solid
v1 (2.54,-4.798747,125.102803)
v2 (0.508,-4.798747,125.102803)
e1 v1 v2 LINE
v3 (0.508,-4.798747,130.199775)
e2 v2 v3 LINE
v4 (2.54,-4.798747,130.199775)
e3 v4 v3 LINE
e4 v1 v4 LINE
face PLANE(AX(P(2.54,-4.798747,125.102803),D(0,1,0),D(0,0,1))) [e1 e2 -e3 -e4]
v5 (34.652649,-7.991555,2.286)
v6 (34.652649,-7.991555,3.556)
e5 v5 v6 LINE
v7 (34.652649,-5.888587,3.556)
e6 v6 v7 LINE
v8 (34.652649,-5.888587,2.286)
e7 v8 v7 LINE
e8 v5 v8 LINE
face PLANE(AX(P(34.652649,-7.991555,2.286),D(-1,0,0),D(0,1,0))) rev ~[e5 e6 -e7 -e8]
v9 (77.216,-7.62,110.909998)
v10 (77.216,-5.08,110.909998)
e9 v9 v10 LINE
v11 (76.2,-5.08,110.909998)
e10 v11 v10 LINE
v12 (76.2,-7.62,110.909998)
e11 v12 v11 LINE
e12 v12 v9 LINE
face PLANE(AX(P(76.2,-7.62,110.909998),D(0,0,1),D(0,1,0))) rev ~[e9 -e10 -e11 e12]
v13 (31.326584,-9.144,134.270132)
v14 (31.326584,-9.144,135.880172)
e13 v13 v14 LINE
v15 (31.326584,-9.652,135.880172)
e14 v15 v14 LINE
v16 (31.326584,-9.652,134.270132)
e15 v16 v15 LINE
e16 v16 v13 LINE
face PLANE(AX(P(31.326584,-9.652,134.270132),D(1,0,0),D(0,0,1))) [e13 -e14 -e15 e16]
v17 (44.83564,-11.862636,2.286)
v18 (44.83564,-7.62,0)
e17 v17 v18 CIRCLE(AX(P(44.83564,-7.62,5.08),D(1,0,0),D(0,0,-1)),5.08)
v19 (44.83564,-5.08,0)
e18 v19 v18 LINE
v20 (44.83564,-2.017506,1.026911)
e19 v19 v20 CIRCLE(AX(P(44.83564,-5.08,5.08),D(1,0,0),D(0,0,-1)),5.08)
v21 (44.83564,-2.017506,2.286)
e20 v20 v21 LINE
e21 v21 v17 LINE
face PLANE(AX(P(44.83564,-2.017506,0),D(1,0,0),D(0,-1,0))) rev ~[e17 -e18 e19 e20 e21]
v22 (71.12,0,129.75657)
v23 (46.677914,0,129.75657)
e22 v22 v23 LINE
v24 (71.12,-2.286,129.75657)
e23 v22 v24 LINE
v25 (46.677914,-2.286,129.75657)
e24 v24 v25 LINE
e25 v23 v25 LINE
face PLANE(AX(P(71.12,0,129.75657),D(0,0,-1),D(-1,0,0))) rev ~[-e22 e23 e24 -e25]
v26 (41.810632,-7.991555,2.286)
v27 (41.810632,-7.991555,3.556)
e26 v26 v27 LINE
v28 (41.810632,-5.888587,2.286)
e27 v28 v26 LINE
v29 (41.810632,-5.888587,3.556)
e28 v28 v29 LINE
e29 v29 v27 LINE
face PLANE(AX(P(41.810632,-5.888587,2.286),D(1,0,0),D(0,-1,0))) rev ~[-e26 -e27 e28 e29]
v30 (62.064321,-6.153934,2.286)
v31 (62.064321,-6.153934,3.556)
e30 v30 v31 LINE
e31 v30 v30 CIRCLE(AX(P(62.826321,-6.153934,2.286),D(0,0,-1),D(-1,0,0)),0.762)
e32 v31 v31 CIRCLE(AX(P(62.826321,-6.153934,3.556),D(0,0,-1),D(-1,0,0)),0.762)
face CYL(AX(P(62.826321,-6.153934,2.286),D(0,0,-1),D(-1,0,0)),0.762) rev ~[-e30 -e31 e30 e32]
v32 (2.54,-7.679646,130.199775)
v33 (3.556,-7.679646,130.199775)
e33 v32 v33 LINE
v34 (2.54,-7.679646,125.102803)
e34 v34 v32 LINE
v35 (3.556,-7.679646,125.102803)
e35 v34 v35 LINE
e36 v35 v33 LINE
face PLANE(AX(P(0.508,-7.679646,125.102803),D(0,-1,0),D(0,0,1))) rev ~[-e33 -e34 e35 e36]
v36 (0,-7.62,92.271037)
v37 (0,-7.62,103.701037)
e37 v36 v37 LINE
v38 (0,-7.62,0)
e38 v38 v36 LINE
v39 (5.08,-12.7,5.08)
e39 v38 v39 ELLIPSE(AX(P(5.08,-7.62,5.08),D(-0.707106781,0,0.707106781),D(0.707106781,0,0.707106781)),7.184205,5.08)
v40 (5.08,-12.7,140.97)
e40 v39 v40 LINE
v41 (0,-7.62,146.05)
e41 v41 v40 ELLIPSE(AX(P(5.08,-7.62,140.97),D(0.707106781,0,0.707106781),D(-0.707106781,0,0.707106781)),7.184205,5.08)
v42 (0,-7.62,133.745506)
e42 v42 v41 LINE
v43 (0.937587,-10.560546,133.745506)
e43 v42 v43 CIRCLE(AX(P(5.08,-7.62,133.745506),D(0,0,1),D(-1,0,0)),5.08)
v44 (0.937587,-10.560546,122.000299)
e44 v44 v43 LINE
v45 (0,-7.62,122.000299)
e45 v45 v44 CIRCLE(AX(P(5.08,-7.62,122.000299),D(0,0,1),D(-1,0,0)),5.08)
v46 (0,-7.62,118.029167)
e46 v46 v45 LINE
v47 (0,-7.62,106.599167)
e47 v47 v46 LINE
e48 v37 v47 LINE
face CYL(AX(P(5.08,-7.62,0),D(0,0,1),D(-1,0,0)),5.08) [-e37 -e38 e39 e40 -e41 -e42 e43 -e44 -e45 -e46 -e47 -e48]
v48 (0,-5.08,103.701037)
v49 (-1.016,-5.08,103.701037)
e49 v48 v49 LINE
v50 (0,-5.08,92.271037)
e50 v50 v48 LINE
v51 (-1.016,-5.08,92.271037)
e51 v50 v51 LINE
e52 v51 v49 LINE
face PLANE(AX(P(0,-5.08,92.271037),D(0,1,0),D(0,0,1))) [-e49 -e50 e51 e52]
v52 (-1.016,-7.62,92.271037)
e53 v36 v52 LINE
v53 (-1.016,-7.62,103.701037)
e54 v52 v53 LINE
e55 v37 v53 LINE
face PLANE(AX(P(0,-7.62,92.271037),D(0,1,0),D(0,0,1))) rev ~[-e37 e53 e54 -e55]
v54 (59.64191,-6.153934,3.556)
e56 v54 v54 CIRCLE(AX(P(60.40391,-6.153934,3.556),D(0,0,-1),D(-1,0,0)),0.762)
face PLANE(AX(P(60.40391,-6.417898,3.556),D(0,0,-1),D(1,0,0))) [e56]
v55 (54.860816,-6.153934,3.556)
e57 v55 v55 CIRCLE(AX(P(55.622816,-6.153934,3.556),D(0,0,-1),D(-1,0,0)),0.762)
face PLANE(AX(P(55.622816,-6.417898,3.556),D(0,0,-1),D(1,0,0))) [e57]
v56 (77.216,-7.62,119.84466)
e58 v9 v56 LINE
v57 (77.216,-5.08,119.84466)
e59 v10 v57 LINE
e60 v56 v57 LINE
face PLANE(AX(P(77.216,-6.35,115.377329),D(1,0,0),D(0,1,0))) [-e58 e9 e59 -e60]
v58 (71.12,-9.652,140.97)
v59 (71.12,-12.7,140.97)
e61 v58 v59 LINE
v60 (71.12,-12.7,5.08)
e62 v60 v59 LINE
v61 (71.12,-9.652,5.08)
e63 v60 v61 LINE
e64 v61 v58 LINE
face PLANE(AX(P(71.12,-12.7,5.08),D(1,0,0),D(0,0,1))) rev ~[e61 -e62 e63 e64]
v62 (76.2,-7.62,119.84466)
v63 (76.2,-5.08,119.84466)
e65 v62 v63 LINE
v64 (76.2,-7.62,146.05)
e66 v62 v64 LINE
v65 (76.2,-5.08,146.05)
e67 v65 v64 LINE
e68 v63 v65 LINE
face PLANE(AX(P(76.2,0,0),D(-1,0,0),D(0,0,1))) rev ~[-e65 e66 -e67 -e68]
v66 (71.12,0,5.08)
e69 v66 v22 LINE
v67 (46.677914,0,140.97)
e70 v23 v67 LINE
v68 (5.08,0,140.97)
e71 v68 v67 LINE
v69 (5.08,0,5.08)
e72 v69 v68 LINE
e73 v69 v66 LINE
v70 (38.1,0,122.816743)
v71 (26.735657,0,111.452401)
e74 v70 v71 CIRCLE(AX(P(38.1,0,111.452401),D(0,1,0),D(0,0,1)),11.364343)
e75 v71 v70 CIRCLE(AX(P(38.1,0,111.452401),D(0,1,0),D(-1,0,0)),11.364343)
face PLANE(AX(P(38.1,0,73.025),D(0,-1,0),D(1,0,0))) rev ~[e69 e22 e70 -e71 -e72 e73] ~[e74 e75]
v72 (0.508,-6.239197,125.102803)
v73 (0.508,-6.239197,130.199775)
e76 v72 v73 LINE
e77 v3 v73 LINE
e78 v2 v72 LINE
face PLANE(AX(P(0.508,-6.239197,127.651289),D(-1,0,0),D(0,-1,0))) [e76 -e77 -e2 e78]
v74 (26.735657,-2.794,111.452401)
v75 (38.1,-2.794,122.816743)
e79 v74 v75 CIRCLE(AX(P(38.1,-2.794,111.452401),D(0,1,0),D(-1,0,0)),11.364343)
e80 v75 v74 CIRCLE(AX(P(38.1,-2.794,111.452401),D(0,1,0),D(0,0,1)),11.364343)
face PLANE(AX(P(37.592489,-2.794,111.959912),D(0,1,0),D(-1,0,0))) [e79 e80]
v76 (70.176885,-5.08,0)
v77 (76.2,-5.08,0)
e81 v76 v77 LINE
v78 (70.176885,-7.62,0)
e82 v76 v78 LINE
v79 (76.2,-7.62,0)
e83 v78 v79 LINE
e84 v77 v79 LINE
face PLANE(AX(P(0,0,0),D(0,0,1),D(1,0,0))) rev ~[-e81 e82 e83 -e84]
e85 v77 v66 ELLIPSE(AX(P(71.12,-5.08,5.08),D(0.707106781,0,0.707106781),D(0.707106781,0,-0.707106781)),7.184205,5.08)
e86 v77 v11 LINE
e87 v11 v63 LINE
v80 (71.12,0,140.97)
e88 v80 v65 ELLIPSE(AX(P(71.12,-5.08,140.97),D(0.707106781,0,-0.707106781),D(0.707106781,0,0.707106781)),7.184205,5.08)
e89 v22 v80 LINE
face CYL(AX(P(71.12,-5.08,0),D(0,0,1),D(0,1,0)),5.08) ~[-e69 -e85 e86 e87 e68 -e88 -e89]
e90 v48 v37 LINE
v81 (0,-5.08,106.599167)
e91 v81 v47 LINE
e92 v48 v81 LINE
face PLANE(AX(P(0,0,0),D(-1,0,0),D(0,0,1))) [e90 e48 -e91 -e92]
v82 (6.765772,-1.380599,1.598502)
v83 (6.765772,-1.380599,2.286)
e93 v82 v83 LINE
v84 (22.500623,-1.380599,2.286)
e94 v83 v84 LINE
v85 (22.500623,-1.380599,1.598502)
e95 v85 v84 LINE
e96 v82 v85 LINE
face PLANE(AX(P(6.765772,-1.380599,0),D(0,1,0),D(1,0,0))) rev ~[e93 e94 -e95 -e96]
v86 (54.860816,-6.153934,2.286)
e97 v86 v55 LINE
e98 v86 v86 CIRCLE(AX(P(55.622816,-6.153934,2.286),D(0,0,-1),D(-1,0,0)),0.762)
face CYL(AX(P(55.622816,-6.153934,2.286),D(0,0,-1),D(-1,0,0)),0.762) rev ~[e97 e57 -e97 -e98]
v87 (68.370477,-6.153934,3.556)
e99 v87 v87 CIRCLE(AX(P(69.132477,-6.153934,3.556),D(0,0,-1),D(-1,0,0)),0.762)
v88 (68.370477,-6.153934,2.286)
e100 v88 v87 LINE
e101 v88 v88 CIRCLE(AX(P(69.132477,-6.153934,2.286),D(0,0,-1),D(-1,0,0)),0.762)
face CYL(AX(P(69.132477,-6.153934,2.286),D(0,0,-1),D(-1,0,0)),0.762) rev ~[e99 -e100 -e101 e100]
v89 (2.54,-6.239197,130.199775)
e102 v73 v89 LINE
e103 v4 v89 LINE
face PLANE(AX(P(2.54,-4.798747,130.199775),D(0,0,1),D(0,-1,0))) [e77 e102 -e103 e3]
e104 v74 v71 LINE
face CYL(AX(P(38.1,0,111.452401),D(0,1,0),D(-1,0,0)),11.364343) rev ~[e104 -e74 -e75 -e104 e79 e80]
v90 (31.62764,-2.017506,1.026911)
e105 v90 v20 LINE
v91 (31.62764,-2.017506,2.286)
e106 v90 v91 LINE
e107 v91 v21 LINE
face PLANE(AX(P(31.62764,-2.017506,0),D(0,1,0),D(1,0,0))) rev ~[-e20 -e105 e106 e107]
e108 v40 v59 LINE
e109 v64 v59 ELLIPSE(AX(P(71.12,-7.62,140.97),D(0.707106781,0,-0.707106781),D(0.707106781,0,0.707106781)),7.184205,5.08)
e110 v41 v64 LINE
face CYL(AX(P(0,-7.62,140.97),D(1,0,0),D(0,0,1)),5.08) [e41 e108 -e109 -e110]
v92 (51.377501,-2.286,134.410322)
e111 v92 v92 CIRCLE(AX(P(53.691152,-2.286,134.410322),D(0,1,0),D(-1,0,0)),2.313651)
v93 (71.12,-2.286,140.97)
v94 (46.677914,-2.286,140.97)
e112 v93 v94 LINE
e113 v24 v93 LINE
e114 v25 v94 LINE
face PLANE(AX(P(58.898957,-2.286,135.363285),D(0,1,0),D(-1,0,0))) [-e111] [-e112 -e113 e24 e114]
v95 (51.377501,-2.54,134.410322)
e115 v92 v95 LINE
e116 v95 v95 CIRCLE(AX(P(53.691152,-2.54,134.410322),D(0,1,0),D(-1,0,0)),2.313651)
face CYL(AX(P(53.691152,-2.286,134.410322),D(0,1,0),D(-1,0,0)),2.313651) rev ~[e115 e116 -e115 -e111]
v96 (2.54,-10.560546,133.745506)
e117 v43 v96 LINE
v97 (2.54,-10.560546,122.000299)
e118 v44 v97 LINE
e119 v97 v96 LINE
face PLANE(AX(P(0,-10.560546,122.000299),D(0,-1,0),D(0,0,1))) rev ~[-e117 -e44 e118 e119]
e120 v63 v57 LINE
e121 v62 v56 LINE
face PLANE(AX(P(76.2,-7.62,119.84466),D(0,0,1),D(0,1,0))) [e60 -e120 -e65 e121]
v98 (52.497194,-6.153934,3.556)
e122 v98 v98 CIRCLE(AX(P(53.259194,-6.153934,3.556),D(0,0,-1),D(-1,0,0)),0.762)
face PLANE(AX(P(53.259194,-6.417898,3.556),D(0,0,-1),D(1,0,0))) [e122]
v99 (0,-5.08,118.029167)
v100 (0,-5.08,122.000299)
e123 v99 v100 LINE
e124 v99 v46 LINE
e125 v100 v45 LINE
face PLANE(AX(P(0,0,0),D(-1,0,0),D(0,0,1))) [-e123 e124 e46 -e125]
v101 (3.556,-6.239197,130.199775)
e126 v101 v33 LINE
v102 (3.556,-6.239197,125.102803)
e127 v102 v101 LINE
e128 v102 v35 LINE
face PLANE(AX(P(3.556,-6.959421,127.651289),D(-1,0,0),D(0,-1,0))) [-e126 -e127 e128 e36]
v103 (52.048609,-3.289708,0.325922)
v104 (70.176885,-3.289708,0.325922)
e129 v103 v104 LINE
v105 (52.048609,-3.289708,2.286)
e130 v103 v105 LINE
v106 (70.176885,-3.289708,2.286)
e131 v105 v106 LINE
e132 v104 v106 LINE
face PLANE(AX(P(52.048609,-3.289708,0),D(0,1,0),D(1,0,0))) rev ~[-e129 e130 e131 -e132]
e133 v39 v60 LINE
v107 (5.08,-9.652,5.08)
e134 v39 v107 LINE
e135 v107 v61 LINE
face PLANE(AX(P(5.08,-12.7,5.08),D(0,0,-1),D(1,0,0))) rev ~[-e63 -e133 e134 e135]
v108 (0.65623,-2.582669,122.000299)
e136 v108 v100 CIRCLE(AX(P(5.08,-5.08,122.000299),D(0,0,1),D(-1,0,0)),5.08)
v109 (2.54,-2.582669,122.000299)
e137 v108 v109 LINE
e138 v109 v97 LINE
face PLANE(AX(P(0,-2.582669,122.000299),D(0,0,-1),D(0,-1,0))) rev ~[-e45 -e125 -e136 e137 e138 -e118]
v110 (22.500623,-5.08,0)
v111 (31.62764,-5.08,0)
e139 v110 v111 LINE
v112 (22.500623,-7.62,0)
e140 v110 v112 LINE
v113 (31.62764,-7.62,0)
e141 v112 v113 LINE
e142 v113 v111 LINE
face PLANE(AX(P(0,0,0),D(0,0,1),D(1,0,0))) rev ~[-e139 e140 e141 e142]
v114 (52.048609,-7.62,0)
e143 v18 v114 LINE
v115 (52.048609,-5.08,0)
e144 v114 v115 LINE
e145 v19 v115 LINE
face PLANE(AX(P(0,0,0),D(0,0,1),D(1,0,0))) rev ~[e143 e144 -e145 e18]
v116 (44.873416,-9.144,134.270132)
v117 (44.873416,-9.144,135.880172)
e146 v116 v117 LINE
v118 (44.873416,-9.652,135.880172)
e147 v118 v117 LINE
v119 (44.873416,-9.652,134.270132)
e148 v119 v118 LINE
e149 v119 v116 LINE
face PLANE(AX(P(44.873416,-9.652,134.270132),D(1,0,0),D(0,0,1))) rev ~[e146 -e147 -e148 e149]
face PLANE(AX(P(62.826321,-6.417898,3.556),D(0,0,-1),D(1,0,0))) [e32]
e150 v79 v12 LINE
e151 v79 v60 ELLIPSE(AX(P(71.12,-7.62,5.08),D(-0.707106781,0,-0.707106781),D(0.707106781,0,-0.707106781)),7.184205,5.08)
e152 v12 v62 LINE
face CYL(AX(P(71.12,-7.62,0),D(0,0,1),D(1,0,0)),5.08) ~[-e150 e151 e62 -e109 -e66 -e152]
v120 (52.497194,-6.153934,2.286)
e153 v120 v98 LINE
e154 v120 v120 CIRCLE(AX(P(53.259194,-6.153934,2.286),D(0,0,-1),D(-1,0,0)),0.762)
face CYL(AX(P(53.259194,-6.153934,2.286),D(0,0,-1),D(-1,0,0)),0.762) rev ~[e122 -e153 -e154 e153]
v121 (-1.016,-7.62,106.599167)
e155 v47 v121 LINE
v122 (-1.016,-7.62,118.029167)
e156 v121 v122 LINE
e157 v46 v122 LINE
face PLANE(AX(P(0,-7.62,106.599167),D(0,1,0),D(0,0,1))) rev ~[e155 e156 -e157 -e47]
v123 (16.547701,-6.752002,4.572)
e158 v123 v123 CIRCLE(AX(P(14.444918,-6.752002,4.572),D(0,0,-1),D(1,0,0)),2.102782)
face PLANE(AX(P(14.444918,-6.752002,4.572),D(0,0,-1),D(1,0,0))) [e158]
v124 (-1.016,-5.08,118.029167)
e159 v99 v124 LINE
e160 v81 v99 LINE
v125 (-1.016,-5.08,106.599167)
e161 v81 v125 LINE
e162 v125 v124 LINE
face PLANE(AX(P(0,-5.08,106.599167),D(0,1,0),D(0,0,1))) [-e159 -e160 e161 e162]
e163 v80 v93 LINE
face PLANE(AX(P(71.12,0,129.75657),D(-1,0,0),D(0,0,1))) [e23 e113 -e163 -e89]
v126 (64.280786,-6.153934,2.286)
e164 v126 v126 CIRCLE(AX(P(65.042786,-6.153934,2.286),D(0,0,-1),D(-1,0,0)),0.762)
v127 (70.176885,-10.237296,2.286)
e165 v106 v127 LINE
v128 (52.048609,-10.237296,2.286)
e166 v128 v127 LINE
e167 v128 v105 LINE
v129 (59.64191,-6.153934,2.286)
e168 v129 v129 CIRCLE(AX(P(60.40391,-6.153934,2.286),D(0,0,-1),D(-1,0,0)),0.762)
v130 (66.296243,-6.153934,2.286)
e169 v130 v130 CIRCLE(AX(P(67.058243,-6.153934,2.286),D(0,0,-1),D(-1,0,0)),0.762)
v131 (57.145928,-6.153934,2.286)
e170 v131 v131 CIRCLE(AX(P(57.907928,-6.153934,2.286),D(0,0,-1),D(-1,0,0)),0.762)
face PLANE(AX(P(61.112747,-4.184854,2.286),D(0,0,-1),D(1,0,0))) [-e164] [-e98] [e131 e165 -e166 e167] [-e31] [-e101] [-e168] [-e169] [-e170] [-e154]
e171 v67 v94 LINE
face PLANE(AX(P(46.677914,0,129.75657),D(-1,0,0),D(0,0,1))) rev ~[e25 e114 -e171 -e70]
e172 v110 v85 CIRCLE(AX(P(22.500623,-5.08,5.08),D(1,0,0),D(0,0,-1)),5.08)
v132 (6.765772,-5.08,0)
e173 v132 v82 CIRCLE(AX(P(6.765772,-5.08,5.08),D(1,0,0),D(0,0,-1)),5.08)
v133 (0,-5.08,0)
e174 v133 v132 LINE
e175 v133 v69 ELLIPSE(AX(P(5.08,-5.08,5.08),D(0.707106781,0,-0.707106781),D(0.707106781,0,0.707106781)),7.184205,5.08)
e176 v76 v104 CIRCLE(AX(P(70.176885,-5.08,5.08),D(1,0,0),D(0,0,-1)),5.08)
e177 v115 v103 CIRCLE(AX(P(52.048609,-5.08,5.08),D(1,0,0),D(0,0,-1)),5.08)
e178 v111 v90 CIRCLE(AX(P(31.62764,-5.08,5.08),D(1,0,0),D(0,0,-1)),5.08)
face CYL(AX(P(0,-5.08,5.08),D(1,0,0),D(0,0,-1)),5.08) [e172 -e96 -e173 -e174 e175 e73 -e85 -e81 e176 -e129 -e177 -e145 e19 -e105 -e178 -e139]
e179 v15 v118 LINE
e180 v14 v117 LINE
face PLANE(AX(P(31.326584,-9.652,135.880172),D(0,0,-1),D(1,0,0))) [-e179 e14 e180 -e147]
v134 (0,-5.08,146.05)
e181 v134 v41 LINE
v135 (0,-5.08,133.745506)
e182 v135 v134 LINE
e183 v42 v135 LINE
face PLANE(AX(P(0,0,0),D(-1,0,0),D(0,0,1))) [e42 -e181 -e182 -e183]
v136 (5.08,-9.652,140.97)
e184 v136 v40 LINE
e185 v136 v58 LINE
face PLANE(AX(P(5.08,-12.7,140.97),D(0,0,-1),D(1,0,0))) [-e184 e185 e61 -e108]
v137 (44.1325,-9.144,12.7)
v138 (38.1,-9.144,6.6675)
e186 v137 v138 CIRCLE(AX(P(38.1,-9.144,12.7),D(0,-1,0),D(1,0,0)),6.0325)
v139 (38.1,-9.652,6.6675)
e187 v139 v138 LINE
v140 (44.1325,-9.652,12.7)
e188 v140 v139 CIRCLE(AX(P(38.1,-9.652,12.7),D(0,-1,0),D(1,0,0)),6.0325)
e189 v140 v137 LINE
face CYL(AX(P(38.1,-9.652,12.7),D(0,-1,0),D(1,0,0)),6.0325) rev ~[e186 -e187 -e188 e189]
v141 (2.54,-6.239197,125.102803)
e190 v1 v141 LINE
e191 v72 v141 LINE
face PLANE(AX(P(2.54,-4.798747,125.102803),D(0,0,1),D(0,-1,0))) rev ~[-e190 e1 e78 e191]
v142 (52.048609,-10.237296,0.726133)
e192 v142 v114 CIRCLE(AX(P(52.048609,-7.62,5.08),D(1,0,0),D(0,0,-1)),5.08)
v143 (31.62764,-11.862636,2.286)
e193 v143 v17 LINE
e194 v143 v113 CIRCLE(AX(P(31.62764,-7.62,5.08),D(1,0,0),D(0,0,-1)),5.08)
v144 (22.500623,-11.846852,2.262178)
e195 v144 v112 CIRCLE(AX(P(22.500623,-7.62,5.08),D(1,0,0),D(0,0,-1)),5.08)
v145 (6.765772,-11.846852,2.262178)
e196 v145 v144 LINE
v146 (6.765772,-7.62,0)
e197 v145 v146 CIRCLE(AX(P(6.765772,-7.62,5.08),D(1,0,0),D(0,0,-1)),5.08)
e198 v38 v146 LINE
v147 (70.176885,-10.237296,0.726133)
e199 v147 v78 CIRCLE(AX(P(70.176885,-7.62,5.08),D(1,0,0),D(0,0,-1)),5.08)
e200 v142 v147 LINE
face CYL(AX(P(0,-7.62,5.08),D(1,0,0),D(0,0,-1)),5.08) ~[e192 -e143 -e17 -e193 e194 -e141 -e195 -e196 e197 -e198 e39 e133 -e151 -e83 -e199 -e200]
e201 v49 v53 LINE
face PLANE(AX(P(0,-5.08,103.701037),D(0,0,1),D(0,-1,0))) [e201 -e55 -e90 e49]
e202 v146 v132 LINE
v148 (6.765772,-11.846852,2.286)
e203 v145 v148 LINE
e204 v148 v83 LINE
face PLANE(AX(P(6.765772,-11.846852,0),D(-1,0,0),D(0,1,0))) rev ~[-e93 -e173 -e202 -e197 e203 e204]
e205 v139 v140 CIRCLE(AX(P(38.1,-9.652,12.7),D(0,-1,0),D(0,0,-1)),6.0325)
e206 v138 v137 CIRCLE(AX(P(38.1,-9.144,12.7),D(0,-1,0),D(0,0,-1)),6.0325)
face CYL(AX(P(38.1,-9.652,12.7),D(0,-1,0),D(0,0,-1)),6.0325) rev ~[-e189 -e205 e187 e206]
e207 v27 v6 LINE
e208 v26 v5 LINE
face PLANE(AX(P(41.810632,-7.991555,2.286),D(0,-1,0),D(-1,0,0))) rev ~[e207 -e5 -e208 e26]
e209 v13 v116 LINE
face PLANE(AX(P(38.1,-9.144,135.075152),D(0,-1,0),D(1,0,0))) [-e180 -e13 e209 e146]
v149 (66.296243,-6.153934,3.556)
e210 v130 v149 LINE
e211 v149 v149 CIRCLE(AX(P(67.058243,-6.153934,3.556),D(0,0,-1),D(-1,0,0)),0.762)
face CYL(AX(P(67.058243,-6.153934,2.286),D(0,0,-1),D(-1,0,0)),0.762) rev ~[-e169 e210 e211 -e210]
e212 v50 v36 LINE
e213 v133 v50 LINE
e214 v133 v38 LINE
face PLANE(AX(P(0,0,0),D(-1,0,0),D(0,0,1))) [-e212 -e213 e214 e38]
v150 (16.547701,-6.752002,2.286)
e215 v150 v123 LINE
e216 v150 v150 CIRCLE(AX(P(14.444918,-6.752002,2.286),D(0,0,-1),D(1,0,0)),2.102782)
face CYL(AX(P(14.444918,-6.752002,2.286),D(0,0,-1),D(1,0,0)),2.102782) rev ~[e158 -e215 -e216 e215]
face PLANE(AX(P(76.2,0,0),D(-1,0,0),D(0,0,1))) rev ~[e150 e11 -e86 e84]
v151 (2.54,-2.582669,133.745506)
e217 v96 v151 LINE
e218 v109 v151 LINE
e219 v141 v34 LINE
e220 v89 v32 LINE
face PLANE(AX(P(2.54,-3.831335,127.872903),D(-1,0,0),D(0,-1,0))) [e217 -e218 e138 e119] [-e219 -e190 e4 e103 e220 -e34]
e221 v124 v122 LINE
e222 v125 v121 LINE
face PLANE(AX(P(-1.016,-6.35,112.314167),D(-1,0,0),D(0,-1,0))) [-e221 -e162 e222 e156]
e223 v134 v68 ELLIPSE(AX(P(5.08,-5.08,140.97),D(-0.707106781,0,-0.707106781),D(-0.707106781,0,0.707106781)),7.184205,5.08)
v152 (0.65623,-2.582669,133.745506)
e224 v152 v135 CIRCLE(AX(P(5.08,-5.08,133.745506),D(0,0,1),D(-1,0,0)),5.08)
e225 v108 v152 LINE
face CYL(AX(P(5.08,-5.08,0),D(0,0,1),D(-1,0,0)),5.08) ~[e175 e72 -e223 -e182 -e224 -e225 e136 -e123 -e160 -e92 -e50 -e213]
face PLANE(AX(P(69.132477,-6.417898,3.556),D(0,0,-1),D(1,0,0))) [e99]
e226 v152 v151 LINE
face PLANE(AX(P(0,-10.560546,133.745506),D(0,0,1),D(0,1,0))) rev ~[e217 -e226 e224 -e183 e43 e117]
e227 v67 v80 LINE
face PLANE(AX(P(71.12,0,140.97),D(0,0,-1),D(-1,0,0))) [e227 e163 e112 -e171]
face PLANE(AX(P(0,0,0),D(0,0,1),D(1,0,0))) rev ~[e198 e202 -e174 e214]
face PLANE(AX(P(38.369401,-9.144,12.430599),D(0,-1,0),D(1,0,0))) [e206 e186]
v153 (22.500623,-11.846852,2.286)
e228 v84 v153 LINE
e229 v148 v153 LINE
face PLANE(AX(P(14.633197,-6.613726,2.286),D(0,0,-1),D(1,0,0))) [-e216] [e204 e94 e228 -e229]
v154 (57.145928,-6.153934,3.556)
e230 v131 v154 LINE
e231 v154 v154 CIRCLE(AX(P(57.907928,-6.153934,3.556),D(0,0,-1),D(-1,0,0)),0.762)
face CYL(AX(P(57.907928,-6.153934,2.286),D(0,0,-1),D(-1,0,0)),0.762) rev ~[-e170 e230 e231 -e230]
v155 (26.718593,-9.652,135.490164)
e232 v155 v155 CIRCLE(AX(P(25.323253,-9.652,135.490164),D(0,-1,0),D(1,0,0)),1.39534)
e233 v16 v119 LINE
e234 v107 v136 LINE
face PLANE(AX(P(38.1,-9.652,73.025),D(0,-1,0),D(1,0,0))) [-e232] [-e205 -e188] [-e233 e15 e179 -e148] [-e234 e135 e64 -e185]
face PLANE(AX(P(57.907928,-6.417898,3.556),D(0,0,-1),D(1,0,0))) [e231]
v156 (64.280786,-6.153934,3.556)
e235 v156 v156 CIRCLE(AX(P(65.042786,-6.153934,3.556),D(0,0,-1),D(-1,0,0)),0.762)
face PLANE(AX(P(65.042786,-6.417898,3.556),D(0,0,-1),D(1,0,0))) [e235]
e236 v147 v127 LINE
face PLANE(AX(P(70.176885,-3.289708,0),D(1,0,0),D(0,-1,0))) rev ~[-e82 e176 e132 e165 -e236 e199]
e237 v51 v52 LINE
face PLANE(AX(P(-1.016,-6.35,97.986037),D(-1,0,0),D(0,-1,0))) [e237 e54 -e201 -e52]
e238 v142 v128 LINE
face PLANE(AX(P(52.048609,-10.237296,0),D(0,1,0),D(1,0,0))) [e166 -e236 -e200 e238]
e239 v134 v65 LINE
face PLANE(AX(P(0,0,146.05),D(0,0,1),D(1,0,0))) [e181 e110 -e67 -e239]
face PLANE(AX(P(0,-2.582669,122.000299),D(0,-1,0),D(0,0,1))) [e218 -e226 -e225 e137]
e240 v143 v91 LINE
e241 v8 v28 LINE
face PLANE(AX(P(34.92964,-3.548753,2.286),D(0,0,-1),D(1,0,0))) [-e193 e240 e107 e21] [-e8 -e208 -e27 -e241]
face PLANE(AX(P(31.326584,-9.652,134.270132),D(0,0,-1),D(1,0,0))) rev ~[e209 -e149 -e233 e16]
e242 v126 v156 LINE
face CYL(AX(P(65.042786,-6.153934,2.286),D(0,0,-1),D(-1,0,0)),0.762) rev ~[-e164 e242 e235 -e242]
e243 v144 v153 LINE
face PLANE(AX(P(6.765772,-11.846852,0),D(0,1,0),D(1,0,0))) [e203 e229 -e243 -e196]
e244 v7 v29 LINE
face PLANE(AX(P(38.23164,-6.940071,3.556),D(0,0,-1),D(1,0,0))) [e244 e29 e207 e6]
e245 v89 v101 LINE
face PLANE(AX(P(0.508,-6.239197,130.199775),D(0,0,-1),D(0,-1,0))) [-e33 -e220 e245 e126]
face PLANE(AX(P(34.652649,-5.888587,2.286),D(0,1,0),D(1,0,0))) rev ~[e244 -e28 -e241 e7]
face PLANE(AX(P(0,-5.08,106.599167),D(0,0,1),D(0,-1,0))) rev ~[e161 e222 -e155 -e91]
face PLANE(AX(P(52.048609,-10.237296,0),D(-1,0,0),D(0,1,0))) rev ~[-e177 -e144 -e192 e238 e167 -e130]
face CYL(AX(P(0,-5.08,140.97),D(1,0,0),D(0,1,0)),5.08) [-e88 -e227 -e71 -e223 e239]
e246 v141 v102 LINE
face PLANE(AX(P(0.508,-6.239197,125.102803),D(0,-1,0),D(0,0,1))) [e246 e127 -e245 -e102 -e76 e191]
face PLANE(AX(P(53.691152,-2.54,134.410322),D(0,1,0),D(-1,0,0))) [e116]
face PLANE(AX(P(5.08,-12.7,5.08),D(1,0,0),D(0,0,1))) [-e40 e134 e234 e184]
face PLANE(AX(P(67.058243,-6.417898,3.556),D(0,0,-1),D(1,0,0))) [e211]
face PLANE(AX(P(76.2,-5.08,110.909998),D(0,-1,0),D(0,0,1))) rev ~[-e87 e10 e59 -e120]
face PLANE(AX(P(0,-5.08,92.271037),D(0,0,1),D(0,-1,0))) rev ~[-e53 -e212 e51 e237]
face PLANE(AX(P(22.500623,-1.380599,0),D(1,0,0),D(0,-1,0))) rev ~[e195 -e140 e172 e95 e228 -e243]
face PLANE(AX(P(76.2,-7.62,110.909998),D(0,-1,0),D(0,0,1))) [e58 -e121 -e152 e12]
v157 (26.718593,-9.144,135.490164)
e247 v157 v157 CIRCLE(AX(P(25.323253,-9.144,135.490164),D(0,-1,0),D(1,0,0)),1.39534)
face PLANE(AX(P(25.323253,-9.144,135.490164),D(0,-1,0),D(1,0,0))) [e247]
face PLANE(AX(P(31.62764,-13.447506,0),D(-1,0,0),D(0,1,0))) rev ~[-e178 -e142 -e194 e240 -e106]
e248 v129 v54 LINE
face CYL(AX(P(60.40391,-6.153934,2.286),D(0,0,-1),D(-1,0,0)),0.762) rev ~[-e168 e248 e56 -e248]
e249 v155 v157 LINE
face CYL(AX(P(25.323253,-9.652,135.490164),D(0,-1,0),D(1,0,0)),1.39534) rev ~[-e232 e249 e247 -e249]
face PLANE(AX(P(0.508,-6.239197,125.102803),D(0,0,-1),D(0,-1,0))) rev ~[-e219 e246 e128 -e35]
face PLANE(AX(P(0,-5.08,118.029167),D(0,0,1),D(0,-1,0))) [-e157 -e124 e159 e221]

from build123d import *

# Parameters (mm, degrees)
F0_W      = 76.2
F0_H      = 146.05
F1_DEPTH  = 12.7
F2_R      = 5.08
F3_R      = 5.08
F4_DEPTH  = 2.54
F5_W      = 2.4973305091
F5_H      = 11.7452070117
F5_W_2    = 2.54
F5_W_3    = 2.9405460703
F6_DEPTH  = 2.54
F7_W      = 2.8808997013
F7_H      = 5.0969719887
F8_DEPTH  = 2.032
F9_W      = 1.4404498506
F9_H      = 5.0969719887
F10_DEPTH = 3.048
F11_W     = 2.54
F11_H     = 11.43
F12_DEPTH = 1.016
F13_W     = 2.54
F13_H     = 11.43
F14_DEPTH = 1.016
F16_DEPTH = 0.508
F17_W     = 15.7348513603
F17_H     = 10.4662538506
F17_H_2   = 4.2268524888
F18_DEPTH = 2.286
F19_W     = 18.1282758713
F19_H     = 1.7902922965
F19_H_2   = 2.54
F19_H_3   = 2.6172961119
F20_DEPTH = 2.286
F21_R     = 2.1027824112
F22_DEPTH = 2.286
F24_DEPTH = 1.27
F25_W     = 13.5468328476
F25_H     = 1.6100406647
F4_FACE_W = 66.04
F4_FACE_H = 135.89
F4_FACE_R = 6.0325
F26_DEPTH = 0.508
F27_R     = 1.3953400064
F28_DEPTH = 0.508
F30_DEPTH = 0.508
F31_W     = 6.604
F31_H     = 3.0624943002
F31_H_2   = 5.8275056998
F31_H_3   = 2.54
F32_DEPTH = 2.286
F34_DEPTH = 1.27
F35_W     = 24.4420864832
F35_H     = 11.2134301376
F36_DEPTH = 2.286
F39_R     = 2.3136513578
F40_DEPTH = 0.254
F42_DEPTH = 1.016
F43_DEPTH = 1.778
F44_W     = 2.54
F44_H     = 8.934661746
F45_DEPTH = 1.016


# Not quite as in the source:
# - the program builds the solid bodies; features that only make, move or delete a surface that nothing else refers to are left out


with BuildPart() as f1:
    # F0 (on Front) → F1 (new body)
    with BuildSketch(Plane.XZ):
        with Locations((38.1, 73.025)):
            Rectangle(F0_W, F0_H)
    extrude(amount=F1_DEPTH)

    # F2
    f2_edges = [f1.edges().sort_by_distance(p)[0] for p in [
        (0, -12.7, 73.025),
        (38.1, -12.7, 0),
        (76.2, -12.7, 73.025),
        (38.1, -12.7, 146.05),
    ]]
    fillet(f2_edges, radius=F2_R)

    # F3
    f3_edges = [f1.edges().sort_by_distance(p)[0] for p in [
        (0, 0, 73.025),
        (38.1, 0, 0),
        (76.2, 0, 73.025),
        (38.1, 0, 146.05),
    ]]
    fillet(f3_edges, radius=F3_R)

    # F4 (cut): a face of the model
    f4_faces = [f1.faces().sort_by_distance(p)[0] for p in [
        (38.1, -12.7, 73.025),
    ]]
    extrude(f4_faces, amount=-F4_DEPTH, mode=Mode.SUBTRACT)

    # F5 (on face) → F6 (cut)
    with BuildSketch(Plane(origin=(0, 0, 0), x_dir=(0, -1, 0), z_dir=(-1, 0, 0))):
        with Locations((3.8313347455, 127.8729029)):
            Rectangle(F5_W, F5_H)
        with Locations((6.35, 127.8729029)):
            Rectangle(F5_W_2, F5_H)
        with Locations((9.0902730352, 127.8729029)):
            Rectangle(F5_W_3, F5_H)
    extrude(amount=-F6_DEPTH, mode=Mode.SUBTRACT)

    # F7 (on face) → F8 (join)
    with BuildSketch(Plane(origin=(2.54, 0, 0), x_dir=(0, -1, 0), z_dir=(-1, 0, 0))):
        with Locations((6.2391965184, 127.6512891054)):
            Rectangle(F7_W, F7_H)
    extrude(amount=F8_DEPTH)

    # F9 (on face) → F10 (cut)
    with BuildSketch(Plane(origin=(0.508, 0, 0), x_dir=(0, -1, 0), z_dir=(-1, 0, 0))):
        with Locations((6.9594214438, 127.6512891054)):
            Rectangle(F9_W, F9_H)
    extrude(amount=-F10_DEPTH, mode=Mode.SUBTRACT)

    # F11 (on face) → F12 (join)
    with BuildSketch(Plane(origin=(0, 0, 0), x_dir=(0, -1, 0), z_dir=(-1, 0, 0))):
        with Locations((6.35, 112.3141669893)):
            Rectangle(F11_W, F11_H)
    extrude(amount=F12_DEPTH)

    # F13 (on face) → F14 (join)
    with BuildSketch(Plane(origin=(0, 0, 0), x_dir=(0, -1, 0), z_dir=(-1, 0, 0))):
        with Locations((6.35, 97.9860373998)):
            Rectangle(F13_W, F13_H)
    extrude(amount=F14_DEPTH)

    # F15 (on face) → F16 (cut)
    with BuildSketch(Plane.XZ.offset(10.16)):
        with BuildLine():
            ThreePointArc((44.1325, 12.7), (33.8343783425, 16.9656216575), (38.1, 6.6675))
            ThreePointArc((38.1, 6.6675), (42.3656216575, 8.4343783425), (44.1325, 12.7))
        make_face()
    extrude(amount=-F16_DEPTH, mode=Mode.SUBTRACT)

    # F17 (on face) → F18 (cut)
    with BuildSketch(Plane(origin=(0, 0, 0), x_dir=(1, 0, 0), z_dir=(0, 0, -1))):
        with Locations((14.6331973374, 6.6137255635)):
            Rectangle(F17_W, F17_H)
        with Locations((14.6331973374, 9.7334262444)):
            Rectangle(F17_W, F17_H_2)
    extrude(amount=-F18_DEPTH, mode=Mode.SUBTRACT)

    # F19 (on face) → F20 (cut)
    with BuildSketch(Plane(origin=(0, 0, 0), x_dir=(1, 0, 0), z_dir=(0, 0, -1))):
        with Locations((61.1127465963, 4.1848538518)):
            Rectangle(F19_W, F19_H)
        with Locations((61.1127465963, 6.35)):
            Rectangle(F19_W, F19_H_2)
        with Locations((61.1127465963, 8.9286480559)):
            Rectangle(F19_W, F19_H_3)
    extrude(amount=-F20_DEPTH, mode=Mode.SUBTRACT)

    # F21 (on face) → F22 (cut)
    with BuildSketch(Plane(origin=(0, 0, 2.286), x_dir=(1, 0, 0), z_dir=(0, 0, -1))):
        with Locations((14.4449183717, 6.7520015873)):
            Circle(F21_R)
    extrude(amount=-F22_DEPTH, mode=Mode.SUBTRACT)

    # F23 (on face) → F24 (cut)
    with BuildSketch(Plane(origin=(0, 0, 2.286), x_dir=(1, 0, 0), z_dir=(0, 0, -1))):
        with BuildLine():
            ThreePointArc((54.0211938972, 6.1539337039), (53.2591938972, 6.9159337039), (52.4971938972, 6.1539337039))
            Line((52.4971938972, 6.1539337039), (54.0211938972, 6.1539337039))
        make_face()
        with BuildLine():
            ThreePointArc((69.8944770451, 6.1539337039), (69.1324770451, 6.9159337039), (68.3704770451, 6.1539337039))
            Line((68.3704770451, 6.1539337039), (69.8944770451, 6.1539337039))
        make_face()
        with BuildLine():
            Line((69.8944770451, 6.1539337039), (68.3704770451, 6.1539337039))
            ThreePointArc((68.3704770451, 6.1539337039), (69.1324770451, 5.3919337039), (69.8944770451, 6.1539337039))
        make_face()
        with BuildLine():
            ThreePointArc((67.8202428575, 6.1539337039), (67.0582428575, 6.9159337039), (66.2962428575, 6.1539337039))
            Line((66.2962428575, 6.1539337039), (67.8202428575, 6.1539337039))
        make_face()
        with BuildLine():
            Line((67.8202428575, 6.1539337039), (66.2962428575, 6.1539337039))
            ThreePointArc((66.2962428575, 6.1539337039), (67.0582428575, 5.3919337039), (67.8202428575, 6.1539337039))
        make_face()
        with BuildLine():
            ThreePointArc((65.8047863002, 6.1539337039), (65.0427863002, 6.9159337039), (64.2807863002, 6.1539337039))
            Line((64.2807863002, 6.1539337039), (65.8047863002, 6.1539337039))
        make_face()
        with BuildLine():
            Line((65.8047863002, 6.1539337039), (64.2807863002, 6.1539337039))
            ThreePointArc((64.2807863002, 6.1539337039), (65.0427863002, 5.3919337039), (65.8047863002, 6.1539337039))
        make_face()
        with BuildLine():
            ThreePointArc((63.588320529, 6.1539337039), (62.826320529, 6.9159337039), (62.064320529, 6.1539337039))
            Line((62.064320529, 6.1539337039), (63.588320529, 6.1539337039))
        make_face()
        with BuildLine():
            Line((63.588320529, 6.1539337039), (62.064320529, 6.1539337039))
            ThreePointArc((62.064320529, 6.1539337039), (62.826320529, 5.3919337039), (63.588320529, 6.1539337039))
        make_face()
        with BuildLine():
            ThreePointArc((61.1659095342, 6.1539337039), (60.4039095342, 6.9159337039), (59.6419095342, 6.1539337039))
            Line((59.6419095342, 6.1539337039), (61.1659095342, 6.1539337039))
        make_face()
        with BuildLine():
            Line((61.1659095342, 6.1539337039), (59.6419095342, 6.1539337039))
            ThreePointArc((59.6419095342, 6.1539337039), (60.4039095342, 5.3919337039), (61.1659095342, 6.1539337039))
        make_face()
        with BuildLine():
            ThreePointArc((58.6699277813, 6.1539337039), (57.9079277813, 6.9159337039), (57.1459277813, 6.1539337039))
            Line((57.1459277813, 6.1539337039), (58.6699277813, 6.1539337039))
        make_face()
        with BuildLine():
            Line((58.6699277813, 6.1539337039), (57.1459277813, 6.1539337039))
            ThreePointArc((57.1459277813, 6.1539337039), (57.9079277813, 5.3919337039), (58.6699277813, 6.1539337039))
        make_face()
        with BuildLine():
            ThreePointArc((56.3848160858, 6.1539337039), (55.6228160858, 6.9159337039), (54.8608160858, 6.1539337039))
            Line((54.8608160858, 6.1539337039), (56.3848160858, 6.1539337039))
        make_face()
        with BuildLine():
            Line((56.3848160858, 6.1539337039), (54.8608160858, 6.1539337039))
            ThreePointArc((54.8608160858, 6.1539337039), (55.6228160858, 5.3919337039), (56.3848160858, 6.1539337039))
        make_face()
        with BuildLine():
            Line((54.0211938972, 6.1539337039), (52.4971938972, 6.1539337039))
            ThreePointArc((52.4971938972, 6.1539337039), (53.2591938972, 5.3919337039), (54.0211938972, 6.1539337039))
        make_face()
    extrude(amount=-F24_DEPTH, mode=Mode.SUBTRACT)

    # F25 (on face) + F4_face (on face) → F26 (cut)
    with BuildSketch(Plane.XZ.offset(9.652)):
        with Locations((38.1, 135.0751519203)):
            Rectangle(F25_W, F25_H)
    with BuildSketch(Plane(origin=(38.1, -10.16, 73.025), x_dir=(1, 0, 0), z_dir=(0, -1, 0))):
        Rectangle(F4_FACE_W, F4_FACE_H)
        with Locations((0, -60.325)):
            Circle(F4_FACE_R, mode=Mode.SUBTRACT)
    extrude(amount=-F26_DEPTH, mode=Mode.SUBTRACT)

    # F27 (on face) → F28 (cut)
    with BuildSketch(Plane.XZ.offset(9.652)):
        with Locations((25.323253125, 135.4901641607)):
            Circle(F27_R)
    extrude(amount=-F28_DEPTH, mode=Mode.SUBTRACT)

    # F29 (on face) → F30 (cut)
    with BuildSketch(Plane.XZ.offset(9.652)):
        with BuildLine():
            ThreePointArc((44.1325, 12.7), (33.8343783425, 16.9656216575), (38.1, 6.6675))
            ThreePointArc((38.1, 6.6675), (42.3656216575, 8.4343783425), (44.1325, 12.7))
        make_face()
    extrude(amount=-F30_DEPTH, mode=Mode.SUBTRACT)

    # F31 (on face) → F32 (cut)
    with BuildSketch(Plane(origin=(0, 0, 0), x_dir=(1, 0, 0), z_dir=(0, 0, -1))):
        with Locations((34.9296401281, 3.5487528499)):
            Rectangle(F31_W, F31_H)
        with Locations((41.5336401281, 10.5337528499)):
            Rectangle(F31_W, F31_H_2)
        with Locations((41.5336401281, 3.5487528499)):
            Rectangle(F31_W, F31_H)
        with Locations((34.9296401281, 6.35)):
            Rectangle(F31_W, F31_H_3)
        with Locations((41.5336401281, 6.35)):
            Rectangle(F31_W, F31_H_3)
        with Locations((34.9296401281, 10.5337528499)):
            Rectangle(F31_W, F31_H_2)
    extrude(amount=-F32_DEPTH, mode=Mode.SUBTRACT)

    # F33 (on face) → F34 (cut)
    with BuildSketch(Plane(origin=(0, 0, 2.286), x_dir=(1, 0, 0), z_dir=(0, 0, -1))):
        Polygon((34.6526485043, 7.9915548147), (34.6526485043, 6.9400710721), (34.6526485043, 5.8885873295), (41.810631752, 5.8885873295), (41.810631752, 7.9915548147), align=None)
    extrude(amount=-F34_DEPTH, mode=Mode.SUBTRACT)

    # F35 (on face) → F36 (cut)
    with BuildSketch(Plane(origin=(0, 0, 0), x_dir=(-1, 0, 0), z_dir=(0, 1, 0))):
        with Locations((-58.8989567584, 135.3632849312)):
            Rectangle(F35_W, F35_H)
    extrude(amount=-F36_DEPTH, mode=Mode.SUBTRACT)

    # F39 (on face) → F40 (cut)
    with BuildSketch(Plane(origin=(0, -2.286, 0), x_dir=(-1, 0, 0), z_dir=(0, 1, 0))):
        with Locations((-53.6911524832, 134.4103217125)):
            Circle(F39_R)
    extrude(amount=-F40_DEPTH, mode=Mode.SUBTRACT)

    # F41 (on face) → F42 (cut)
    with BuildSketch(Plane(origin=(0, 0, 0), x_dir=(-1, 0, 0), z_dir=(0, 1, 0))):
        with BuildLine():
            ThreePointArc((-38.1, 122.8167432735), (-46.1358037085, 103.4165969759), (-26.7356574109, 111.4524006844))
            ThreePointArc((-26.7356574109, 111.4524006844), (-30.0641962915, 119.4882043929), (-38.1, 122.8167432735))
        make_face()
        with BuildLine():
            ThreePointArc((-26.7356574109, 111.4524006844), (-30.0641962915, 119.4882043929), (-38.1, 122.8167432735))
            ThreePointArc((-38.1, 122.8167432735), (-46.1358037085, 103.4165969759), (-26.7356574109, 111.4524006844))
        make_face()
    extrude(amount=-F42_DEPTH, mode=Mode.SUBTRACT)

    # F43 (cut): a face of the model
    f43_faces = [f1.faces().sort_by_distance(p)[0] for p in [
        (38.1, -1.016, 111.4524006844),
    ]]
    extrude(f43_faces, amount=-F43_DEPTH, mode=Mode.SUBTRACT)

    # F44 (on face) → F45 (join)
    with BuildSketch(Plane.YZ.offset(76.2)):
        with Locations((-6.35, 115.3773292899)):
            Rectangle(F44_W, F44_H)
    extrude(amount=F45_DEPTH)


solid = f1.part
